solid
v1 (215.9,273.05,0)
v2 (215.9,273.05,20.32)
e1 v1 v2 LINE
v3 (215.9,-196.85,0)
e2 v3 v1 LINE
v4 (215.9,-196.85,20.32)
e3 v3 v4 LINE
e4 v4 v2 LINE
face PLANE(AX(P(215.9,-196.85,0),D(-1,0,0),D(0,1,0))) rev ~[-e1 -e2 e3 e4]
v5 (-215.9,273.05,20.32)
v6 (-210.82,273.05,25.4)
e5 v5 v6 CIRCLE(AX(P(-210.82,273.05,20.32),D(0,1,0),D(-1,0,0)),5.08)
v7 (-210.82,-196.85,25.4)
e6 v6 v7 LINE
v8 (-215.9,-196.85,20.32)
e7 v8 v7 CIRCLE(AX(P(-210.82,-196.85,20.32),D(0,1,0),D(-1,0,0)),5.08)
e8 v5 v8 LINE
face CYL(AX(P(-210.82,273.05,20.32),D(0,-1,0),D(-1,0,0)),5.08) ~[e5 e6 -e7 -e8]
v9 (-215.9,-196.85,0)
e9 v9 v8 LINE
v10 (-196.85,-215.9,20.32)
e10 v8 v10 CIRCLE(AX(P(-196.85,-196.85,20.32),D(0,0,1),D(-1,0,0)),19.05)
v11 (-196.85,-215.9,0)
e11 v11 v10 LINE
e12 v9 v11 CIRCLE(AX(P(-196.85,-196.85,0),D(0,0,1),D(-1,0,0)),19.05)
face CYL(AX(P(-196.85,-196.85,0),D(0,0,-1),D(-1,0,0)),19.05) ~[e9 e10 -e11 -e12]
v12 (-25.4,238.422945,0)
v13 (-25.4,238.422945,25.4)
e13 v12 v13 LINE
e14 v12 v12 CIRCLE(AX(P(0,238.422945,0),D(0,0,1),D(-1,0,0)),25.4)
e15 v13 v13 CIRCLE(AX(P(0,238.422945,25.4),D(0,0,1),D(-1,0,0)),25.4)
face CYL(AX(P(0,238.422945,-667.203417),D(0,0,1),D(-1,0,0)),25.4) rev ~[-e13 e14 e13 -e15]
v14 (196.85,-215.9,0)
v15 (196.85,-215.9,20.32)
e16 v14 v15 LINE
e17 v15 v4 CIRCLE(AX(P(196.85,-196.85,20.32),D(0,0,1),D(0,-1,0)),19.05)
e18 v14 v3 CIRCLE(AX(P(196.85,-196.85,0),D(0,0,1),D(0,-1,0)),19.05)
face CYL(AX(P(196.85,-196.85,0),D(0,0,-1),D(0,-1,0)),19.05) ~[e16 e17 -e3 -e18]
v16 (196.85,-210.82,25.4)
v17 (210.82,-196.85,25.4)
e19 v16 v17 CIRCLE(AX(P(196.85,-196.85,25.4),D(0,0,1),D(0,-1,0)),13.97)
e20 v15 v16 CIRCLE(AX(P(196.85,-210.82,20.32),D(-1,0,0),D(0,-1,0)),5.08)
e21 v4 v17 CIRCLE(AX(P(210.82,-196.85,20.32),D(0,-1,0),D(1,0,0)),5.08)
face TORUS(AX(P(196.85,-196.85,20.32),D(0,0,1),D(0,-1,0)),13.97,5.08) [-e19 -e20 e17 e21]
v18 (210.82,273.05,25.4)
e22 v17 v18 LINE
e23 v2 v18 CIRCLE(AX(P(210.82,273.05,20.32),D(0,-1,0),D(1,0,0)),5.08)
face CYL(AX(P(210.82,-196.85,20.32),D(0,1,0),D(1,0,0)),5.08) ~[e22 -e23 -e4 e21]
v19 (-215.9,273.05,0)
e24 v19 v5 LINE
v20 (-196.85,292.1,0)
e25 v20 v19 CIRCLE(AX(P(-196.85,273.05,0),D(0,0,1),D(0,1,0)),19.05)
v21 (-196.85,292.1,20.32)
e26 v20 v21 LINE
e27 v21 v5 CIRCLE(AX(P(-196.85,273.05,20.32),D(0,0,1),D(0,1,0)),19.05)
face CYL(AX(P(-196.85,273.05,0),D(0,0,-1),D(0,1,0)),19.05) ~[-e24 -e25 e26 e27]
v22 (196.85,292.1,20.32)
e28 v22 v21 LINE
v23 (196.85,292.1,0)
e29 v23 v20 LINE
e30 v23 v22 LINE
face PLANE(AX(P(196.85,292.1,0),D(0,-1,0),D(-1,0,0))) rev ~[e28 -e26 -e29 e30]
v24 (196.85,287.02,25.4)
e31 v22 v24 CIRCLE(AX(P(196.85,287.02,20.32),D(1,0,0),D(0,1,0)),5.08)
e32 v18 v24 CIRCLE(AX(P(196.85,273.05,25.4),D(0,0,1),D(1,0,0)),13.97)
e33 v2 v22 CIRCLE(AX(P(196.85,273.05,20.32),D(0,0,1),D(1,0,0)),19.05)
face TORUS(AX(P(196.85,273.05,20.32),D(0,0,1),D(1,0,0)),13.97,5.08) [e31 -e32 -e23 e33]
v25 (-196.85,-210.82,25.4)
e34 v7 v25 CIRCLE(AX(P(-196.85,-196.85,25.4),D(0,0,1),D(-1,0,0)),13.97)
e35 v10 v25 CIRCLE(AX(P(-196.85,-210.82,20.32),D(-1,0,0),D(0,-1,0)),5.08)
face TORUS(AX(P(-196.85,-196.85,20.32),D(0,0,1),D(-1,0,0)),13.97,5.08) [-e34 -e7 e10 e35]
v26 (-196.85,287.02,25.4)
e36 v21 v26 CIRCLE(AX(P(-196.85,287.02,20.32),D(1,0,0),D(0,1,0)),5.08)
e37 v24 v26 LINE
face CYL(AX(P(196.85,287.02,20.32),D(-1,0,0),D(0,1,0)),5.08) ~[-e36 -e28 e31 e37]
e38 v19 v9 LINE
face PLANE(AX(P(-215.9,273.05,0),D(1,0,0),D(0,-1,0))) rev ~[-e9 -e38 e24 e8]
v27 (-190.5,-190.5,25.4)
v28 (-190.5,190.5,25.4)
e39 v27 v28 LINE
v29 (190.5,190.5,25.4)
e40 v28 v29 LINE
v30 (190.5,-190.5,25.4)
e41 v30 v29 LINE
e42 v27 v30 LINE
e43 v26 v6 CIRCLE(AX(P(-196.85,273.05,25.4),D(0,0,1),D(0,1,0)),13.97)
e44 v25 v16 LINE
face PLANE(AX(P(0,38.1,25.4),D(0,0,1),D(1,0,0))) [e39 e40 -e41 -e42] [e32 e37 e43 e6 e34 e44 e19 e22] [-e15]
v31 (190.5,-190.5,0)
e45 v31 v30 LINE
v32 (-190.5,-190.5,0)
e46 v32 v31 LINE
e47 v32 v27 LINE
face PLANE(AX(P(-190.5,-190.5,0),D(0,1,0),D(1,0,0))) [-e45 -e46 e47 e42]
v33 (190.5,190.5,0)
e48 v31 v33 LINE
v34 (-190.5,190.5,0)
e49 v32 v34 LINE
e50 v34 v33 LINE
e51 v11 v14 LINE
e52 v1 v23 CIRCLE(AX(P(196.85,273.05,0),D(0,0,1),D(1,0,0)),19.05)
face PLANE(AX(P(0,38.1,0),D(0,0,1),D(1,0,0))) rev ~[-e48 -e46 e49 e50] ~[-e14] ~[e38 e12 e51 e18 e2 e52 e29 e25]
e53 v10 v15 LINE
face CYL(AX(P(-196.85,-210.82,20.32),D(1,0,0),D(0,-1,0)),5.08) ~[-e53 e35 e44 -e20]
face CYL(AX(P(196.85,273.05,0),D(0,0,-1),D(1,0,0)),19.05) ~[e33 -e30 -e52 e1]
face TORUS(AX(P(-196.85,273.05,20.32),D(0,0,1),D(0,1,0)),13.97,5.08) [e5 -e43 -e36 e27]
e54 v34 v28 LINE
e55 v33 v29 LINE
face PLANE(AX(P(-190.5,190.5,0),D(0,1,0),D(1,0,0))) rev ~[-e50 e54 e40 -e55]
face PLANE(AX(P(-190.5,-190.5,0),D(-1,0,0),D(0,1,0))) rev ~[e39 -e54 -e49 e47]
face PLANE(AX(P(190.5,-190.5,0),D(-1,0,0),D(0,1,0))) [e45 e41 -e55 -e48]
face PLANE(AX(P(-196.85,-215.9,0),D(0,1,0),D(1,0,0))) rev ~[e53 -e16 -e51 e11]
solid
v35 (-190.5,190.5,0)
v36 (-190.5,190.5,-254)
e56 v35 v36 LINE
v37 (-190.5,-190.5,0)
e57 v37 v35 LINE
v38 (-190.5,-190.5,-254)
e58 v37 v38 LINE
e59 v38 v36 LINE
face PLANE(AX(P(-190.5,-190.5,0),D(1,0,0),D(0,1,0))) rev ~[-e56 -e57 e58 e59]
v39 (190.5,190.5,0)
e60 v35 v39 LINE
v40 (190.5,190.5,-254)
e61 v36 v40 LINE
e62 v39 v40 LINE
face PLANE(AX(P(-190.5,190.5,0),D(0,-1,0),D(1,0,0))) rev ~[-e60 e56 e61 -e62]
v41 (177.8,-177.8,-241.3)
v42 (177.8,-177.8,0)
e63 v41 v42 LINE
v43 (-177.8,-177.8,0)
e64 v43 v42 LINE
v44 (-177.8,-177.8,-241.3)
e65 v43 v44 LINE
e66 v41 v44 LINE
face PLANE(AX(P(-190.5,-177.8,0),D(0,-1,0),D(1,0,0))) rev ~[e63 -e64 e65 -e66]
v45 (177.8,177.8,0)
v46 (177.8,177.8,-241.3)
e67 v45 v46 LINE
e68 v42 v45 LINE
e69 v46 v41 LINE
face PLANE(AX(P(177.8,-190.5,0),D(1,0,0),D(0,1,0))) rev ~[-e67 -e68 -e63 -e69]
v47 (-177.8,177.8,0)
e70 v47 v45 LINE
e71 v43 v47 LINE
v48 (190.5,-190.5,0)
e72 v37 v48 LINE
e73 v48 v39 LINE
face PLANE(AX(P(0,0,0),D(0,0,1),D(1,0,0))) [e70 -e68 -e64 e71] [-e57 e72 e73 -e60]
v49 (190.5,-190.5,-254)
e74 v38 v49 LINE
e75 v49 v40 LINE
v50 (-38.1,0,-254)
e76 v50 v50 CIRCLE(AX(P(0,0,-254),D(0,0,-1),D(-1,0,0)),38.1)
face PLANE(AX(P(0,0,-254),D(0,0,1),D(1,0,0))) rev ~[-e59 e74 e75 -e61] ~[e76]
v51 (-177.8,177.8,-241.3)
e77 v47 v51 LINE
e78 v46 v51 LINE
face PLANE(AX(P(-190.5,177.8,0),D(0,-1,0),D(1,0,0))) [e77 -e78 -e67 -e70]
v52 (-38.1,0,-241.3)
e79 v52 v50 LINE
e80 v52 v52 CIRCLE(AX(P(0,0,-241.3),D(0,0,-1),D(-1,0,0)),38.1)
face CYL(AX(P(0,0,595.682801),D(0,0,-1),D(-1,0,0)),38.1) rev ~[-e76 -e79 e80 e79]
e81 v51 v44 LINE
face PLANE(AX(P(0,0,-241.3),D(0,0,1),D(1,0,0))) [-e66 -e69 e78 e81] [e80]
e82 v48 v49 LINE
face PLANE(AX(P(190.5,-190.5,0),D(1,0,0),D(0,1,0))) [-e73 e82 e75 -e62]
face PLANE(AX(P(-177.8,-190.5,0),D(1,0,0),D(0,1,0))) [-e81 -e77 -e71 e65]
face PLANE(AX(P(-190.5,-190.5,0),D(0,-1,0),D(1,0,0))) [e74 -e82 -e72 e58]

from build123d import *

# Parameters (mm, degrees)
F1_W     = 381
F1_H     = 381
F4_DEPTH = 254
F2_W     = 381
F2_H     = 381
F5_DEPTH = 25.4
F6_R     = 5.08
F7_D     = 50.8
F8_T     = -12.7
F9_D     = 76.2


with BuildPart() as f4:
    # F1 (on Top) → F4 (new body)
    with BuildSketch(Plane.XY):
        Rectangle(F1_W, F1_H)
    extrude(amount=-F4_DEPTH)

    # F8
    f8_openings = [f4.faces().sort_by_distance(p)[0] for p in [
        (0, 0, 0),
    ]]
    offset(amount=F8_T, openings=f8_openings)

    # F9 (through all)
    with Locations(Plane.XY):
        with Locations((0, 0)):
            Hole(F9_D / 2)


with BuildPart() as f5:
    # F2 (on face) → F5 (new body)
    with BuildSketch(Plane.XY):
        with BuildLine():
            Line((196.85, 292.1), (-196.85, 292.1))
            ThreePointArc((-196.85, 292.1), (-210.3203841816, 286.5203841816), (-215.9, 273.05))
            Line((-215.9, 273.05), (-215.9, -196.85))
            ThreePointArc((-215.9, -196.85), (-210.3203841816, -210.3203841816), (-196.85, -215.9))
            Line((-196.85, -215.9), (196.85, -215.9))
            ThreePointArc((196.85, -215.9), (210.3203841816, -210.3203841816), (215.9, -196.85))
            Line((215.9, -196.85), (215.9, 273.05))
            ThreePointArc((215.9, 273.05), (210.3203841816, 286.5203841816), (196.85, 292.1))
        make_face()
        Rectangle(F2_W, F2_H, mode=Mode.SUBTRACT)
    extrude(amount=F5_DEPTH)

    # F6
    f6_edges = [f5.edges().sort_by_distance(p)[0] for p in [
        (-215.9, 38.1, 25.4),
        (-210.320384, 286.520384, 25.4),
        (0, 292.1, 25.4),
        (210.320384, 286.520384, 25.4),
        (215.9, 38.1, 25.4),
        (210.320384, -210.320384, 25.4),
        (0, -215.9, 25.4),
        (-210.320384, -210.320384, 25.4),
    ]]
    fillet(f6_edges, radius=F6_R)

    # F7 (through all)
    with Locations(Plane(origin=(0, 0, 0), x_dir=(1, 0, 0), z_dir=(0, 0, -1))):
        with Locations((0, -238.4229451418)):
            Hole(F7_D / 2)


solid = Compound([f4.part, f5.part])
